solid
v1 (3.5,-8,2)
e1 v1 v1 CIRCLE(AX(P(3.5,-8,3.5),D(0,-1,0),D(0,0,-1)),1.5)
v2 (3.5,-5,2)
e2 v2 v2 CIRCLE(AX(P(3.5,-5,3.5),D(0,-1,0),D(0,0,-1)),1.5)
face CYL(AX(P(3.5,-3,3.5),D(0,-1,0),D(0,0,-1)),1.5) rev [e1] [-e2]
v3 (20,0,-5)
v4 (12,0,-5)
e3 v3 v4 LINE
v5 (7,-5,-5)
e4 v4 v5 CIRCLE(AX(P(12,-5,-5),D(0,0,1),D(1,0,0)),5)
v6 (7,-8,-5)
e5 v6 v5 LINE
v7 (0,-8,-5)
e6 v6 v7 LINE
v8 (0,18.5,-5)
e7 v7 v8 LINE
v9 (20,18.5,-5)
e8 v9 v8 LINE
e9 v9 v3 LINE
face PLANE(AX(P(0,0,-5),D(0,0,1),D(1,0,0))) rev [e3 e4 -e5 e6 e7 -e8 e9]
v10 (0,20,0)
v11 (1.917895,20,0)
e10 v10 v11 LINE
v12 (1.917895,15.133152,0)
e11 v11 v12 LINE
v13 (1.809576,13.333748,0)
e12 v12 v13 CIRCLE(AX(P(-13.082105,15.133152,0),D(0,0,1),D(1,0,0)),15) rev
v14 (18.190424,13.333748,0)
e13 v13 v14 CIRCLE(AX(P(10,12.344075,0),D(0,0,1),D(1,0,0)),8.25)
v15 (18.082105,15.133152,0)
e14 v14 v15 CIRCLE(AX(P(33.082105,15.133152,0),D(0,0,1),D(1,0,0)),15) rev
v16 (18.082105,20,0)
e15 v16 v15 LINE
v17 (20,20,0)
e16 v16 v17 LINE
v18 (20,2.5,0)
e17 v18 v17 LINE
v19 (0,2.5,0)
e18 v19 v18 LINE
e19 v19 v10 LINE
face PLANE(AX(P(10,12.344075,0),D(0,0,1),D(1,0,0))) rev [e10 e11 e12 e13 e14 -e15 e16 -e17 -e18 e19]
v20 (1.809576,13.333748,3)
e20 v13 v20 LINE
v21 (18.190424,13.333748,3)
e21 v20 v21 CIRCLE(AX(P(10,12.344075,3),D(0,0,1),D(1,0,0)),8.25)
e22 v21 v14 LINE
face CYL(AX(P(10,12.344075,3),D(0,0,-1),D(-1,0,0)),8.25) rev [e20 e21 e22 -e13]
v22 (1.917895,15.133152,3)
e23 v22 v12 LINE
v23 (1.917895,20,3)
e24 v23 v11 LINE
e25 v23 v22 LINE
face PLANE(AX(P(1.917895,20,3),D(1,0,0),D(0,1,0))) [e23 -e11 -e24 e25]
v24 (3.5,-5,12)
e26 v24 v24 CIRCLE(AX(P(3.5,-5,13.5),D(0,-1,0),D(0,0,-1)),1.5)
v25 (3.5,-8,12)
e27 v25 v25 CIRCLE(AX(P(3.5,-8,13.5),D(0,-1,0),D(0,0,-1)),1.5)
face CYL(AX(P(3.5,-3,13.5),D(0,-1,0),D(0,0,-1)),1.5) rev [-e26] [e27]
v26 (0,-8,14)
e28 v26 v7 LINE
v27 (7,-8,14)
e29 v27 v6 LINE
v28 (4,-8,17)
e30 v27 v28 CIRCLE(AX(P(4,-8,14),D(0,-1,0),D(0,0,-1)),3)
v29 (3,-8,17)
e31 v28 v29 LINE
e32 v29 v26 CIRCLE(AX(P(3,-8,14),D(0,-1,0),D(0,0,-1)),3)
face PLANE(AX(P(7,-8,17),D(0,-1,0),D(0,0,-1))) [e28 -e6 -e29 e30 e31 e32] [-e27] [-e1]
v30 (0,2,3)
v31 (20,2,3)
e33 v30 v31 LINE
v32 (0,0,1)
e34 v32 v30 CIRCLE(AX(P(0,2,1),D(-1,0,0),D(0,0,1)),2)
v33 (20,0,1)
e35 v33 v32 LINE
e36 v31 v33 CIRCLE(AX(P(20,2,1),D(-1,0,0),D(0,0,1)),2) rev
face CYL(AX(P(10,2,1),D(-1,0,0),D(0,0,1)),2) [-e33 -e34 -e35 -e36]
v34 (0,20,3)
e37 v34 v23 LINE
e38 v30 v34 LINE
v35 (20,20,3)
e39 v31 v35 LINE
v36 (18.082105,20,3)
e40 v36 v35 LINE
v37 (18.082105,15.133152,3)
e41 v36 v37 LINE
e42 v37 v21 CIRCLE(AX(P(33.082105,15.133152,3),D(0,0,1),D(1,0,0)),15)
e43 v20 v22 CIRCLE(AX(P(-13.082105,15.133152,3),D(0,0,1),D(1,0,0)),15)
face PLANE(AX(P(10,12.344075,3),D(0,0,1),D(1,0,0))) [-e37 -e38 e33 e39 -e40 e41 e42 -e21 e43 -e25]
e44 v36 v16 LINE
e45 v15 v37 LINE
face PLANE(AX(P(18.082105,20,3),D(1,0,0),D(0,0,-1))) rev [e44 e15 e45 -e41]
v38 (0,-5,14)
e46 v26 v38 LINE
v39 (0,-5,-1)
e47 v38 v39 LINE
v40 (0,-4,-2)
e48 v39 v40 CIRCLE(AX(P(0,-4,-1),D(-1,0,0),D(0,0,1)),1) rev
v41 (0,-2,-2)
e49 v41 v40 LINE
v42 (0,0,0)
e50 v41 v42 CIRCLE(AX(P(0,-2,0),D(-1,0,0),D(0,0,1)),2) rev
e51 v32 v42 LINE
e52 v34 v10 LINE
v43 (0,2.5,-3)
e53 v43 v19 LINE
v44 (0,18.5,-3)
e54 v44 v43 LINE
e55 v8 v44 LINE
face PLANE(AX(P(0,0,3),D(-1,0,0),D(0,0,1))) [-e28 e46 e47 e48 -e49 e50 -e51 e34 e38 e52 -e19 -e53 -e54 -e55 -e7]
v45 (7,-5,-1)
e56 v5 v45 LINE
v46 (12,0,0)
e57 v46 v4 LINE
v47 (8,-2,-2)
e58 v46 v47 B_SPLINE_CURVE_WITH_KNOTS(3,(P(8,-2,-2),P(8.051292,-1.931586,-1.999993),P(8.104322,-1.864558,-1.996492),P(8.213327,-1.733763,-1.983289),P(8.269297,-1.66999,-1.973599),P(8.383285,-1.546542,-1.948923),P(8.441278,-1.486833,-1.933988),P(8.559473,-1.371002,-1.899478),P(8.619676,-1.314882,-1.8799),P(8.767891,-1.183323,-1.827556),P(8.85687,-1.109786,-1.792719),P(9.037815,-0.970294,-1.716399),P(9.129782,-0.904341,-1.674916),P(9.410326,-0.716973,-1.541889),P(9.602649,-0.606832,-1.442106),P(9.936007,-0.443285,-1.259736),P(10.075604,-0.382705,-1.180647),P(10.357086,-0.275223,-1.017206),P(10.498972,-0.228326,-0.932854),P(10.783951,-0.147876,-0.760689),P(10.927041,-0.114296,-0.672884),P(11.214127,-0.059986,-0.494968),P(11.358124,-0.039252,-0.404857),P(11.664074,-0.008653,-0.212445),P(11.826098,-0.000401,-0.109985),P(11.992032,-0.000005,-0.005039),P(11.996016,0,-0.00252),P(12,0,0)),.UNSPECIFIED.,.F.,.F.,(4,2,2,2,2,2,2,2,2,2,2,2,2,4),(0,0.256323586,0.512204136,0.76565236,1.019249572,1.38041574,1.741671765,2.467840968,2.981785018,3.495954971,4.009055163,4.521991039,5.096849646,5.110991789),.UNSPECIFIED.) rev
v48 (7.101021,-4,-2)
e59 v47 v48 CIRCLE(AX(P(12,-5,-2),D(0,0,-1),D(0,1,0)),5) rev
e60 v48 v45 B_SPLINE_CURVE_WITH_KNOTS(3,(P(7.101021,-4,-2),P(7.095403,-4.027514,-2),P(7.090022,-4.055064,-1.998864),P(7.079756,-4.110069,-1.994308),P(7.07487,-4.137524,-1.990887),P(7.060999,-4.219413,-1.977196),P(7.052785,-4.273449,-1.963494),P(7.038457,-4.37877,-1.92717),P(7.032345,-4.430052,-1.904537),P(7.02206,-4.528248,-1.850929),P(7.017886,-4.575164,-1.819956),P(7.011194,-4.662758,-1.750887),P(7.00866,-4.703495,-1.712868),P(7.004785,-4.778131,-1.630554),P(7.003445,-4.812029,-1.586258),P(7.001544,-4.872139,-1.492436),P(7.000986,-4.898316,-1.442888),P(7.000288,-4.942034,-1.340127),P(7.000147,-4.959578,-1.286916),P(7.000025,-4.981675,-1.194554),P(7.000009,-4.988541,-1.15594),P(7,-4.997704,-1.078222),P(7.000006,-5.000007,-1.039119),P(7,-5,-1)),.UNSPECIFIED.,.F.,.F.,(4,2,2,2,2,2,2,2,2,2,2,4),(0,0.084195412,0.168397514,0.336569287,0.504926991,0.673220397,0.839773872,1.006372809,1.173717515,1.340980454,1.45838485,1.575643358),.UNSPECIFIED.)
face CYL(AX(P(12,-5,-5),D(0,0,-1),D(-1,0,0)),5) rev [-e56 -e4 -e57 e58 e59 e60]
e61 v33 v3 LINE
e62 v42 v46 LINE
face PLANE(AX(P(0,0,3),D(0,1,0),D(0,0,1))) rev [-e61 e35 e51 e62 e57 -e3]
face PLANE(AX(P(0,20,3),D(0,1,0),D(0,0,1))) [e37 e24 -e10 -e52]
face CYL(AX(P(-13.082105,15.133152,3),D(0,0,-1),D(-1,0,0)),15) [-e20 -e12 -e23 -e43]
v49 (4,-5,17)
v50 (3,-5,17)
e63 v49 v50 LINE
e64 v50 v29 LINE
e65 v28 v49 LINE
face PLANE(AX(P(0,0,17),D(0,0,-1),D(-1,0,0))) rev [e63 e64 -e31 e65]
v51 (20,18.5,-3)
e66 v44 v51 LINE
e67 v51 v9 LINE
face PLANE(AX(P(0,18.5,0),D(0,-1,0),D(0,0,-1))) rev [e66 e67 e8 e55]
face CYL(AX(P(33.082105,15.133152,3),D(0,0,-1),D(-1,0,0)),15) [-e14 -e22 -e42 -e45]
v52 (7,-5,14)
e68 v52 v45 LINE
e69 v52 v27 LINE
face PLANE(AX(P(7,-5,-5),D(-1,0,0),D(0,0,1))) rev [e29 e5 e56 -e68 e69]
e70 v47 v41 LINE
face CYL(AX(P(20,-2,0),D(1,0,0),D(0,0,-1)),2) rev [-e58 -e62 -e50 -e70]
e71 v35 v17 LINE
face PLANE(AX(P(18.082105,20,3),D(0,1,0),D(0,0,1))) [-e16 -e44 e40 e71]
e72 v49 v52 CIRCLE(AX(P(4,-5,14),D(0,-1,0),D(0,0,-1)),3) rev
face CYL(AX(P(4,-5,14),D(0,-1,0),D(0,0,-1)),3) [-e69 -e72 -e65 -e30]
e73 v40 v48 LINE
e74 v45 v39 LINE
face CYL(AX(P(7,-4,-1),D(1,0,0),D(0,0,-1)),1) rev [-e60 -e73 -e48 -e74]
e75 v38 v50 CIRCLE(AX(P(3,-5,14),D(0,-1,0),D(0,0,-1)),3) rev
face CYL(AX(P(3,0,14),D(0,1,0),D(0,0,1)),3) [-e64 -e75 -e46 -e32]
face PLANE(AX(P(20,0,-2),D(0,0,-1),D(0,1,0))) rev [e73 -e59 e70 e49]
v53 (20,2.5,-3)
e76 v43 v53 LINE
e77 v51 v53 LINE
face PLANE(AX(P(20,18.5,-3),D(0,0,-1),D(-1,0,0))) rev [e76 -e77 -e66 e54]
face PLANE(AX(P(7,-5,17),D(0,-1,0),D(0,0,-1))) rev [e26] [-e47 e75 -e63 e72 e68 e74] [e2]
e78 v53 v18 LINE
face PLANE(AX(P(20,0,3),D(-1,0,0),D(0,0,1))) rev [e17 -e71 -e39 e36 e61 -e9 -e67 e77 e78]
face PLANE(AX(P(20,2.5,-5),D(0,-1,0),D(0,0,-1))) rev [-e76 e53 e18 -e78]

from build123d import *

# Parameters (mm, degrees)
BOSS_EXTRUDE1_DEPTH = 3
SKETCH2_W           = 20
SKETCH2_H           = 2.5
BOSS_EXTRUDE2_DEPTH = 5
SKETCH3_W           = 20
SKETCH3_H           = 2
BOSS_EXTRUDE3_DEPTH = 16
FILLET1_R           = 15
SKETCH4_W           = 7
SKETCH4_H           = 8
BOSS_EXTRUDE4_DEPTH = 5
SKETCH5_W           = 7
SKETCH5_H           = 3
BOSS_EXTRUDE5_DEPTH = 22
FILLET2_R           = 5
SKETCH7_W           = 5
SKETCH7_H           = 5
CUT_EXTRUDE1_DEPTH  = 34
FILLET3_R           = 2
CUT_EXTRUDE2_DEPTH  = 5
FILLET4_R           = 3
FILLET5_R           = 1


with BuildPart() as part:
    # Sketch1 → Boss-Extrude1 (new body)
    with BuildSketch(Plane.XY):
        with BuildLine():
            Line((18.08210451, 20), (20, 20))
            Line((20, 20), (20, 0))
            Line((20, 0), (0, 0))
            Line((0, 0), (0, 20))
            Line((0, 20), (1.91789549, 20))
            Line((1.91789549, 20), (1.91789549, 14))
            ThreePointArc((1.91789549, 14), (10, 4.094075277), (18.08210451, 14))
            Line((18.08210451, 14), (18.08210451, 20))
        make_face()
    extrude(amount=BOSS_EXTRUDE1_DEPTH)

    # Sketch2 → Boss-Extrude2 (add)
    with BuildSketch(Plane(origin=(0, 0, 0), x_dir=(-1, 0, 0), z_dir=(0, 0, -1))):
        with Locations((-10, 1.25)):
            Rectangle(SKETCH2_W, SKETCH2_H)
    extrude(amount=BOSS_EXTRUDE2_DEPTH)

    # Sketch3 → Boss-Extrude3 (add)
    with BuildSketch(Plane(origin=(0, 2.5, 0), x_dir=(1, 0, 0), z_dir=(0, 1, 0))):
        with Locations((10, 4)):
            Rectangle(SKETCH3_W, SKETCH3_H)
    extrude(amount=BOSS_EXTRUDE3_DEPTH)

    # Fillet1
    fillet1_edges = [part.edges().sort_by_distance(p)[0] for p in [
        (1.91789549, 14, 1.5),
        (18.08210451, 14, 1.5),
    ]]
    fillet(fillet1_edges, radius=FILLET1_R)

    # Sketch4 → Boss-Extrude4 (add)
    with BuildSketch(Plane.XZ):
        with Locations((3.5, -1)):
            Rectangle(SKETCH4_W, SKETCH4_H)
    extrude(amount=BOSS_EXTRUDE4_DEPTH)

    # Sketch5 → Boss-Extrude5 (add)
    with BuildSketch(Plane(origin=(0, 0, -5), x_dir=(-1, 0, 0), z_dir=(0, 0, -1))):
        with Locations((-3.5, -6.5)):
            Rectangle(SKETCH5_W, SKETCH5_H)
    extrude(amount=-BOSS_EXTRUDE5_DEPTH)

    # Fillet2
    fillet2_edges = [part.edges().sort_by_distance(p)[0] for p in [
        (7, 0, -1),
    ]]
    fillet(fillet2_edges, radius=FILLET2_R)

    # Sketch7 → Cut-Extrude1 (cut, through all)
    with BuildSketch(Plane.ZY):
        with Locations((0.5, -2.5)):
            Rectangle(SKETCH7_W, SKETCH7_H)
    extrude(amount=-CUT_EXTRUDE1_DEPTH, mode=Mode.SUBTRACT)

    # Fillet3
    fillet3_edges = [part.edges().sort_by_distance(p)[0] for p in [
        (10, 0, 3),
        (6, 0, -2),
    ]]
    fillet(fillet3_edges, radius=FILLET3_R)

    # Sketch6 → Cut-Extrude2 (cut)
    with BuildSketch(Plane(origin=(0, -8, 0), x_dir=(-1, 0, 0), z_dir=(0, -1, 0))):
        with BuildLine():
            ThreePointArc((-3.5, -2), (-5, -3.5), (-3.5, -5))
            Line((-3.5, -5), (-3.5, -2))
        make_face()
        with BuildLine():
            Line((-3.5, -2), (-3.5, -5))
            ThreePointArc((-3.5, -5), (-2.439339828, -4.560660172), (-2, -3.5))
            ThreePointArc((-2, -3.5), (-2.439339828, -2.439339828), (-3.5, -2))
        make_face()
        with BuildLine():
            ThreePointArc((-3.5, -12), (-5, -13.5), (-3.5, -15))
            Line((-3.5, -15), (-3.5, -12))
        make_face()
        with BuildLine():
            Line((-3.5, -12), (-3.5, -15))
            ThreePointArc((-3.5, -15), (-2.439339828, -14.560660172), (-2, -13.5))
            ThreePointArc((-2, -13.5), (-2.439339828, -12.439339828), (-3.5, -12))
        make_face()
    extrude(amount=-CUT_EXTRUDE2_DEPTH, mode=Mode.SUBTRACT)

    # Fillet4
    fillet4_edges = [part.edges().sort_by_distance(p)[0] for p in [
        (7, -6.5, 17),
        (0, -6.5, 17),
    ]]
    fillet(fillet4_edges, radius=FILLET4_R)

    # Fillet5
    # the kernel refuses this fillet: 1 mm, written as the material it adds along each edge
    with BuildSketch(Plane(origin=(0, -5, -2), x_dir=(0, 0, 1), z_dir=(1, 0, 0))) as fillet5_piece_1_section:
        with BuildLine():
            CenterArc((FILLET5_R, -FILLET5_R), FILLET5_R, 90, 90)
            Line((0, -FILLET5_R), (0, 0))
            Line((0, 0), (FILLET5_R, 0))
        make_face()
    fillet5_piece_1 = extrude(amount=9.5, mode=Mode.PRIVATE)
    fillet5_piece_1 = fillet5_piece_1 - Plane(origin=(12, -5, -1.773604886), x_dir=(-1, 0, 0), z_dir=(0, 0, -1)) * Cylinder(5, 23, mode=Mode.PRIVATE)
    add(fillet5_piece_1)


solid = part.part
